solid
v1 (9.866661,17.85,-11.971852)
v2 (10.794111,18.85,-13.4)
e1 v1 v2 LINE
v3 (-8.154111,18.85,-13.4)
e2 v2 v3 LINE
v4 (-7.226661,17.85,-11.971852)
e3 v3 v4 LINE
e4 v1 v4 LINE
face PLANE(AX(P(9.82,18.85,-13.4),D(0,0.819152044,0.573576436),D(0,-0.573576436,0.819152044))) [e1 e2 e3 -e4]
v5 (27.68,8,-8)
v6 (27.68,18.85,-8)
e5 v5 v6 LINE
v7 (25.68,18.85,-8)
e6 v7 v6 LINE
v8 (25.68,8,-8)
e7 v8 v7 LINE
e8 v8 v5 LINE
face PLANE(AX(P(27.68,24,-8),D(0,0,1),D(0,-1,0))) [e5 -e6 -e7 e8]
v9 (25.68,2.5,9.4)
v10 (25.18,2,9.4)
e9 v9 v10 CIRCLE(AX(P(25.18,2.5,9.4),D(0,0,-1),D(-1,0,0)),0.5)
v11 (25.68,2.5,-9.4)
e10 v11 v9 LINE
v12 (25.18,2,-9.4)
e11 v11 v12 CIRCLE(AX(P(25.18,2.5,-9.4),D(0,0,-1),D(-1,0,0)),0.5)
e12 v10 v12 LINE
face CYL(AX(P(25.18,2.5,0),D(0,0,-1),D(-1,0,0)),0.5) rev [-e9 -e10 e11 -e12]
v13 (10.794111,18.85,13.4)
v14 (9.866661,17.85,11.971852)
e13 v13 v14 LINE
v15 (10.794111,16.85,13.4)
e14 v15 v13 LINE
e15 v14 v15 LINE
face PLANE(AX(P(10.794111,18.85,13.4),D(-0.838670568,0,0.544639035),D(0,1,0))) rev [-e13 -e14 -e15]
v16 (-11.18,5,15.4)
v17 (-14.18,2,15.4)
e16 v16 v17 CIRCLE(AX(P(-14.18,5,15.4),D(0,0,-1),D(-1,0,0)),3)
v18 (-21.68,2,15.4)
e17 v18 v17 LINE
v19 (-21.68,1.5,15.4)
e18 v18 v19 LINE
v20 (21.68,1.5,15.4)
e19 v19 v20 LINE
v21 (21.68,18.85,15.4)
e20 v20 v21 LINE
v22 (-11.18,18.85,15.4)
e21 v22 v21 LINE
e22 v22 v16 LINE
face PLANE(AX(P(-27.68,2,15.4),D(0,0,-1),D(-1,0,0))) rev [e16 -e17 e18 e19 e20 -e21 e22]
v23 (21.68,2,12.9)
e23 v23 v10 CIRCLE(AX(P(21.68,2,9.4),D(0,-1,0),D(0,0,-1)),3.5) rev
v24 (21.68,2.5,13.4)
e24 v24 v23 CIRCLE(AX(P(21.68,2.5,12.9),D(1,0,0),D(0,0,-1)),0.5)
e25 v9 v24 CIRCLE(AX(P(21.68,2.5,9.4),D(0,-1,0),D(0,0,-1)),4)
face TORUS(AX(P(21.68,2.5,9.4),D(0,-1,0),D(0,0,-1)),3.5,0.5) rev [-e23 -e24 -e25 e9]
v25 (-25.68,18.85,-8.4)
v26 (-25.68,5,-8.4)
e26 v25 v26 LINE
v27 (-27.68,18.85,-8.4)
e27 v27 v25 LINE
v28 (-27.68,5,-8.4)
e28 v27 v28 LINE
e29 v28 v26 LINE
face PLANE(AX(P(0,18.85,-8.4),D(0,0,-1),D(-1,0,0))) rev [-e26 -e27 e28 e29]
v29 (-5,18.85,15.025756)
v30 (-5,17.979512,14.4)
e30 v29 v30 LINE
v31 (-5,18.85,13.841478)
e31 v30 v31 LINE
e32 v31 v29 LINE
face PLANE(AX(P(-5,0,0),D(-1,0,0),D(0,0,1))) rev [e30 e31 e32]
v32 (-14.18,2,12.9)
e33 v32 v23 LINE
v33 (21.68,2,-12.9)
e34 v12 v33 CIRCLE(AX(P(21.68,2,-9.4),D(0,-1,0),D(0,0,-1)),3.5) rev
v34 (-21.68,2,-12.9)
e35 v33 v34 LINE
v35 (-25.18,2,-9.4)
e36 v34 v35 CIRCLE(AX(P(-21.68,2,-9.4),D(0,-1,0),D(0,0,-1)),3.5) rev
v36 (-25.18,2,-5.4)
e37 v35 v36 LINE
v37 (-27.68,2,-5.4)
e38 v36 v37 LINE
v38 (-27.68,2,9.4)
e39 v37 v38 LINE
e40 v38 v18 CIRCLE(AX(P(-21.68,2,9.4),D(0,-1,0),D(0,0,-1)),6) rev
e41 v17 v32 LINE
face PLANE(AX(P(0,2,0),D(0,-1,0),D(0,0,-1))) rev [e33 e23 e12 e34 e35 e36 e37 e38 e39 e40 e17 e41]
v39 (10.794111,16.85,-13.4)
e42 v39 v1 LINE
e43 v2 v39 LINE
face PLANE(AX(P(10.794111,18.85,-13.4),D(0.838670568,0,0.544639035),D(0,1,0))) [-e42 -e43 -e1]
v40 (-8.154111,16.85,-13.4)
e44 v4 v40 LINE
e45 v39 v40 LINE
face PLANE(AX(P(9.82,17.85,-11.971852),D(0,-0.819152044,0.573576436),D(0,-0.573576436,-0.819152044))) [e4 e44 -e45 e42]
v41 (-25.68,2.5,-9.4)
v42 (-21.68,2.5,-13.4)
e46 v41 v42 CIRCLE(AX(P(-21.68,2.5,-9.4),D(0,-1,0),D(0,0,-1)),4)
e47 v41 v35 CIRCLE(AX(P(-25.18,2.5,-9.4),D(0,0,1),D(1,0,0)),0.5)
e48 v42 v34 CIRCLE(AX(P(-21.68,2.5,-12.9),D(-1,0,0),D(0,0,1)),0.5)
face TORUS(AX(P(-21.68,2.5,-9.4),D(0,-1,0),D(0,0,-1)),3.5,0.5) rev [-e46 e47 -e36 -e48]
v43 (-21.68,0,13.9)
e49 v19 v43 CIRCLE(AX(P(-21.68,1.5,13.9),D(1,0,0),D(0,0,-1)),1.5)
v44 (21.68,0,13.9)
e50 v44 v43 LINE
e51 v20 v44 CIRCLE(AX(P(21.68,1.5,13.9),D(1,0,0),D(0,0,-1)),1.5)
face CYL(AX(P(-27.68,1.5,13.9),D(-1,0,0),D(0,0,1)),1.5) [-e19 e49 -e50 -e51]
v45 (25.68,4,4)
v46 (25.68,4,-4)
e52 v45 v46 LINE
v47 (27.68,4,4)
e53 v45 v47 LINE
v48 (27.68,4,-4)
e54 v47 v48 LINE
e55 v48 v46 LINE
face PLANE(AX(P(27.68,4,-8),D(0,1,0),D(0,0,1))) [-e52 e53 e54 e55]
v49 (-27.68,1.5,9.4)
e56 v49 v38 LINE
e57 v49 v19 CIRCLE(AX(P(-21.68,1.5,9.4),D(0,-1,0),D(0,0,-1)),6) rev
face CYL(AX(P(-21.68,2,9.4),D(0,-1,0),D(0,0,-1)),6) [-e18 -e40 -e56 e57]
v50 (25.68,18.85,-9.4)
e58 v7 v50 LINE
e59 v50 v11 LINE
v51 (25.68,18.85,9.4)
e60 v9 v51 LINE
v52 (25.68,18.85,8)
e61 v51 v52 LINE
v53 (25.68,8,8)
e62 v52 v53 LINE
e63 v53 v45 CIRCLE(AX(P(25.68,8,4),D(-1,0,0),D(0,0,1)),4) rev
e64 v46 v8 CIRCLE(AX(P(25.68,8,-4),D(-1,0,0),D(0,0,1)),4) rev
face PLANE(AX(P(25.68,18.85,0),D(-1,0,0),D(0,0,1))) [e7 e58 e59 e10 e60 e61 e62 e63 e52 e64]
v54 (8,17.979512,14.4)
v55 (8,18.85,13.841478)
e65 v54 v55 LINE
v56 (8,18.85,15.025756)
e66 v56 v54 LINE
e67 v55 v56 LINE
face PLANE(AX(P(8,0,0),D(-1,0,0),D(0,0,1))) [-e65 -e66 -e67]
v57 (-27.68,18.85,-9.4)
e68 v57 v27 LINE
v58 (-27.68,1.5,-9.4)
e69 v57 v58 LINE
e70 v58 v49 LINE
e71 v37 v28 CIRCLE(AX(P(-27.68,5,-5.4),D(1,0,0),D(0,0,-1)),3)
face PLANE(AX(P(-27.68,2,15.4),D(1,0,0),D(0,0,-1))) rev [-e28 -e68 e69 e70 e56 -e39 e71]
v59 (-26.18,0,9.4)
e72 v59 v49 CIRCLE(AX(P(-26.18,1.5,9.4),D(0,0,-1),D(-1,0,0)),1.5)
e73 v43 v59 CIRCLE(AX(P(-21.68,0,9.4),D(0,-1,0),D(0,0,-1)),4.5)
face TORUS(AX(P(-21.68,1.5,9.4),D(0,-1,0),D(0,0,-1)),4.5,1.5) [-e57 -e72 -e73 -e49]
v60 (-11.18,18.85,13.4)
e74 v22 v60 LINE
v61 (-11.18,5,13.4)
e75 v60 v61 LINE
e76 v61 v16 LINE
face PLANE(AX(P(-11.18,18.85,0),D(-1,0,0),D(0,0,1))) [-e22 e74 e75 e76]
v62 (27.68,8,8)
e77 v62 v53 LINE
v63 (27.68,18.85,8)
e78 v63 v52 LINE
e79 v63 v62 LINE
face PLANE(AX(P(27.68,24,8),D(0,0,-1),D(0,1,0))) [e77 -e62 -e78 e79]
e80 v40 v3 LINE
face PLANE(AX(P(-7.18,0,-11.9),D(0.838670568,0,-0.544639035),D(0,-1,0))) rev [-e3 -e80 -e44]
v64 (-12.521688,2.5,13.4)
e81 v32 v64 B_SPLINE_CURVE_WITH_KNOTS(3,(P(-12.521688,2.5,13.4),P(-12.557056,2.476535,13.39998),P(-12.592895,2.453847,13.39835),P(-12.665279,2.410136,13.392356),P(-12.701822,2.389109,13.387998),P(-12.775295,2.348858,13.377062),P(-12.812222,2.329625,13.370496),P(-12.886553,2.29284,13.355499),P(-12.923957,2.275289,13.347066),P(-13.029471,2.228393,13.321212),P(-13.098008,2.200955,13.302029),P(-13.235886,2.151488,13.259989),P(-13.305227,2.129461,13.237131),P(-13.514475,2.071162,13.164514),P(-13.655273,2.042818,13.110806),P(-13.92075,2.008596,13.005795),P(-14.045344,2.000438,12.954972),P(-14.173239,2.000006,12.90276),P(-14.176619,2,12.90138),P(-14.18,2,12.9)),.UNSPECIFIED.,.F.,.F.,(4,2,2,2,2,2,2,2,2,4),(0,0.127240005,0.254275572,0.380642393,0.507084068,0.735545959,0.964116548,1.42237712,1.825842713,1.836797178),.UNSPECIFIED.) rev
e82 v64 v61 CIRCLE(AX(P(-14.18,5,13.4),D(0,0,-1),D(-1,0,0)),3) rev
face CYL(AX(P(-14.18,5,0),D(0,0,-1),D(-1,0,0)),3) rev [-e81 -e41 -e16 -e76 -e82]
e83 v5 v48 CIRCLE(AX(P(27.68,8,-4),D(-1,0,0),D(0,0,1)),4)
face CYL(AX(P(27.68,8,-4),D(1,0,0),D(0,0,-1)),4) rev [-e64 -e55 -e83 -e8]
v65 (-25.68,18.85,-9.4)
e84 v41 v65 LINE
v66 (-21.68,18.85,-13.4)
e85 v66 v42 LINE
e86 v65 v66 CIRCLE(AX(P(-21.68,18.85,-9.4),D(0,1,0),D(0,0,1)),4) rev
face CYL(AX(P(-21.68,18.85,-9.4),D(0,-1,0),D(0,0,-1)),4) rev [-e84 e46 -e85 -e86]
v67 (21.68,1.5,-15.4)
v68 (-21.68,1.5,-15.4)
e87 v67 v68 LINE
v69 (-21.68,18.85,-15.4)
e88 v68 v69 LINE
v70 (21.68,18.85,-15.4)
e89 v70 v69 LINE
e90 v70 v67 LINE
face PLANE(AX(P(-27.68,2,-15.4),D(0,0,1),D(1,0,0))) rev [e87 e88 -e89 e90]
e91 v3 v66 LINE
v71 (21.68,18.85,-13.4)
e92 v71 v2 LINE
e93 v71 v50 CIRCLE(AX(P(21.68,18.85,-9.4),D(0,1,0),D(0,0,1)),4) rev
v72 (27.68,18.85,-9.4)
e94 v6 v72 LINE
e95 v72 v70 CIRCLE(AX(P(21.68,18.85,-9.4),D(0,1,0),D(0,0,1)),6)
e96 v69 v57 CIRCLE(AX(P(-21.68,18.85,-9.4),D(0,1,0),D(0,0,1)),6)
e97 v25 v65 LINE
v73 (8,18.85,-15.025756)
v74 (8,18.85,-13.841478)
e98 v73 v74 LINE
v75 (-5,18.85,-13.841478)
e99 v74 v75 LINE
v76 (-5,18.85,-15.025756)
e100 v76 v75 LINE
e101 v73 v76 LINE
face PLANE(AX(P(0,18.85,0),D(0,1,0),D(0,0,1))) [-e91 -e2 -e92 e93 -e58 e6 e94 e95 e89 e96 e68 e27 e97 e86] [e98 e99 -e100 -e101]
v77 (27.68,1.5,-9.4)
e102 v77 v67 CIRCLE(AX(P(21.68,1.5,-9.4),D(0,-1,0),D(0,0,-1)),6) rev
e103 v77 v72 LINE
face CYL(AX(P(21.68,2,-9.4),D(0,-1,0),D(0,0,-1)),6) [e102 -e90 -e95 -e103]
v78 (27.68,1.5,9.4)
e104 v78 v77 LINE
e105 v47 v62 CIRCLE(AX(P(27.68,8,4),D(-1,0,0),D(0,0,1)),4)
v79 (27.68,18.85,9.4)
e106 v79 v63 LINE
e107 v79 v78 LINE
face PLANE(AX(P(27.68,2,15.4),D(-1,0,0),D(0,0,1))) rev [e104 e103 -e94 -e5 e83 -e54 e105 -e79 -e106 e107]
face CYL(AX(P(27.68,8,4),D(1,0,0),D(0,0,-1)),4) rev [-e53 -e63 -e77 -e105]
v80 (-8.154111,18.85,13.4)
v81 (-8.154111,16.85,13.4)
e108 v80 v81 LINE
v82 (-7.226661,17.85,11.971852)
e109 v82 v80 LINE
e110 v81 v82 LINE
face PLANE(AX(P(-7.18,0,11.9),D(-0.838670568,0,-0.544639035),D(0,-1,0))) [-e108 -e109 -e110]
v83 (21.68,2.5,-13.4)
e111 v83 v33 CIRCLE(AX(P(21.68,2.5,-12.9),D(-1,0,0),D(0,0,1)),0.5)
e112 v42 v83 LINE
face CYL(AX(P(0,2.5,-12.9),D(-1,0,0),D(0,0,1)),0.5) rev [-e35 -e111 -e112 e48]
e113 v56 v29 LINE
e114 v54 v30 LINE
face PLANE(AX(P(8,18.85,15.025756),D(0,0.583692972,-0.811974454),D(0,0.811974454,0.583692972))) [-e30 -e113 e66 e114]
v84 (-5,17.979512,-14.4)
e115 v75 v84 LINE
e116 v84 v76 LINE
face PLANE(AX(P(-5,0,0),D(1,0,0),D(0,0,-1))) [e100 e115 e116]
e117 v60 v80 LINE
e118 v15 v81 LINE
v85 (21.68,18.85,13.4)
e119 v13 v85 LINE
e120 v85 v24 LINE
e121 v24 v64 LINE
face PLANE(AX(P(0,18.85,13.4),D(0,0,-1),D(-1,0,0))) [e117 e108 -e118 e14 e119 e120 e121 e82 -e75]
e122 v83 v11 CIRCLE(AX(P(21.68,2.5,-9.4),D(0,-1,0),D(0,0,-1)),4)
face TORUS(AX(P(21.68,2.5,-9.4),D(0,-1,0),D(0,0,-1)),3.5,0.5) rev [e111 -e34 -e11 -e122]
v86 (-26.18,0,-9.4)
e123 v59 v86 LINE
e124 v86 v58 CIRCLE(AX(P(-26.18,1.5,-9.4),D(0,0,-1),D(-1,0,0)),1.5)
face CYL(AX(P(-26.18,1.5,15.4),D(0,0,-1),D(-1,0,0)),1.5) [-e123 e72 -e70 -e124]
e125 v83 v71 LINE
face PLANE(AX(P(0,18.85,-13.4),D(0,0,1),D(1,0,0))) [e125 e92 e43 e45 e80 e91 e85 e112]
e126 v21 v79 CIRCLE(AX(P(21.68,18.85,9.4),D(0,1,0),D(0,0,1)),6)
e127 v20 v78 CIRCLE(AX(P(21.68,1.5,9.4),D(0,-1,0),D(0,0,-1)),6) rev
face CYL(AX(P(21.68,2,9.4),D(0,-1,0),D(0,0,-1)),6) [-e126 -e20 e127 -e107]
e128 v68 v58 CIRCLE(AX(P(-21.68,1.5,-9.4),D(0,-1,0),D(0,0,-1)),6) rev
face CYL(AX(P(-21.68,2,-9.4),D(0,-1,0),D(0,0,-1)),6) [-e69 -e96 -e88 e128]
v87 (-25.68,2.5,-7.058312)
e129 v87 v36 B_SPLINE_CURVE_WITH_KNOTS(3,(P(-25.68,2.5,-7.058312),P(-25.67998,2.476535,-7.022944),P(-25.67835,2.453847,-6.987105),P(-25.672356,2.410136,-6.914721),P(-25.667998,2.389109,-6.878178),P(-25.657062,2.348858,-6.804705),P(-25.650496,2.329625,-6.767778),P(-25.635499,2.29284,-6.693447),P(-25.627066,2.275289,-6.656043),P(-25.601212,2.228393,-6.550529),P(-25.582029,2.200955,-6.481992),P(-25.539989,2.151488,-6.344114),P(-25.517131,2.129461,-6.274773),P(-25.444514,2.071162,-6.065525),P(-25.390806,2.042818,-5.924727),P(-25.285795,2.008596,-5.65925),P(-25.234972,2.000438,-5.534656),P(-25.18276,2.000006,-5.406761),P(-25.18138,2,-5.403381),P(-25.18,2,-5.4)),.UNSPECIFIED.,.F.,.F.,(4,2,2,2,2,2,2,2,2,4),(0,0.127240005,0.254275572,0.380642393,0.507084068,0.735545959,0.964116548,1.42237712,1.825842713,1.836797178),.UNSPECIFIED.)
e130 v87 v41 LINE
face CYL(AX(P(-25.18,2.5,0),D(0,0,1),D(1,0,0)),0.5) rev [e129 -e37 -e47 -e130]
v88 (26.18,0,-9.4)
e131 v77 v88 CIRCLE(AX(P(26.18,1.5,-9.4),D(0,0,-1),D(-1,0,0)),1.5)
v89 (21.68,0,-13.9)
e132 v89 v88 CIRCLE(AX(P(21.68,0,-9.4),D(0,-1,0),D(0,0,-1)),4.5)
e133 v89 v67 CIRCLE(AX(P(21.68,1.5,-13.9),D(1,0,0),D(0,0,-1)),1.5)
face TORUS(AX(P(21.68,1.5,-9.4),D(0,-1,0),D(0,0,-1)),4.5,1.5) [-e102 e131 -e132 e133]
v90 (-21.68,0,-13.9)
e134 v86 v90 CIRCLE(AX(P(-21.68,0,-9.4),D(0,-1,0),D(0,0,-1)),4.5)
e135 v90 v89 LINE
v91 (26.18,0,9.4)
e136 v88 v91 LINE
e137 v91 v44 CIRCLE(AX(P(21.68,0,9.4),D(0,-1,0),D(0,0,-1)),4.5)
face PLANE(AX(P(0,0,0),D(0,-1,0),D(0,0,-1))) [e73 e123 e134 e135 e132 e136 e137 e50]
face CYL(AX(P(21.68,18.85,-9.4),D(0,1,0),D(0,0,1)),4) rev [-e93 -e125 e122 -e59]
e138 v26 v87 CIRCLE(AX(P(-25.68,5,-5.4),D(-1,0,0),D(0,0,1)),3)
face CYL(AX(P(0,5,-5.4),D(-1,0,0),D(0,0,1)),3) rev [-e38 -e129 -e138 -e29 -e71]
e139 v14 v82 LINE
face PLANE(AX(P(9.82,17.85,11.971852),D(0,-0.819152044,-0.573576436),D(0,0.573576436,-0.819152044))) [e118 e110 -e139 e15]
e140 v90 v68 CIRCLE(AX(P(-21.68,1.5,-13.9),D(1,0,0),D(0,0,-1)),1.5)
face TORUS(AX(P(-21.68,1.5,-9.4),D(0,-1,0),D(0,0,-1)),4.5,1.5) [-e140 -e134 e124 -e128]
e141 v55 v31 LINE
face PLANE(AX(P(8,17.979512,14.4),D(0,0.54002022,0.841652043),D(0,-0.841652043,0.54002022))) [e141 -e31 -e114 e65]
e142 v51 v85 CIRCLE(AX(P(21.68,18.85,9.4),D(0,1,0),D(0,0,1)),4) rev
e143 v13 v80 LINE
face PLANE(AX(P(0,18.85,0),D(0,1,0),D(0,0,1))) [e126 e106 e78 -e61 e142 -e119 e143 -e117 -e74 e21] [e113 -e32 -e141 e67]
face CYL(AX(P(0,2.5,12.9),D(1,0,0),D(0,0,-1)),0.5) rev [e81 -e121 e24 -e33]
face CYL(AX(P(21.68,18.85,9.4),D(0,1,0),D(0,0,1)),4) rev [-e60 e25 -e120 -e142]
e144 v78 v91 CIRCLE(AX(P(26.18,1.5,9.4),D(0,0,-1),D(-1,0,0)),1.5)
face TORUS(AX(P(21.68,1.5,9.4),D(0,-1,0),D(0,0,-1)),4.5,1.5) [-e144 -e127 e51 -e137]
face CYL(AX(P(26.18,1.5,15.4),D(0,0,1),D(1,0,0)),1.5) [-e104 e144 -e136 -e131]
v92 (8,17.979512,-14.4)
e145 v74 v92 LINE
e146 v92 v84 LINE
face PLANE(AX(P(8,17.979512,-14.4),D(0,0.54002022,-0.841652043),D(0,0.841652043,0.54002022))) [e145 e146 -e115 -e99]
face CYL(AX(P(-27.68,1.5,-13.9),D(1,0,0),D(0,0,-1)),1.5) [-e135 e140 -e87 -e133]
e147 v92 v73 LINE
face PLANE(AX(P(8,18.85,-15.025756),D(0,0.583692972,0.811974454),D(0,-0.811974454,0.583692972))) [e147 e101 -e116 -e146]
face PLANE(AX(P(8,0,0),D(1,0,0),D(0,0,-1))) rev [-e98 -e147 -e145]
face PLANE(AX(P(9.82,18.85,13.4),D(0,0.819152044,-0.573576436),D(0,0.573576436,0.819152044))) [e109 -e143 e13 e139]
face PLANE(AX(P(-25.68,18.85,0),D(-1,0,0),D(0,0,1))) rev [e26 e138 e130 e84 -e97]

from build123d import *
from OCP.BRepFilletAPI import BRepFilletAPI_MakeFillet

# Parameters (mm, degrees)
SKETCH1_W               = 55.36
SKETCH1_H               = 30.8
BOSS_EXTRUDE1_DEPTH     = 2
SKETCH3_W               = 2
SKETCH3_H               = 5
BOSS_EXTRUDE3_DEPTH     = 16.85
SKETCH5_W               = 16
SKETCH5_H               = 20
CUT_EXTRUDE1_DEPTH      = 37.860071894
FILLET1_R1              = 6
FILLET1_R2              = 4
FILLET2_R               = 1.5
BOSS_EXTRUDE4_START     = -3
BOSS_EXTRUDE4_DEPTH     = 17
CHAMFER1_SIZE           = 0.97411139
CHAMFER1_SIZE_2         = 1.5
FILLET6_R               = 0.5
FILLET7_R               = 4
CUT_EXTRUDE2_DEPTH      = 8
CUT_EXTRUDE2_DEPTH_BACK = 5
FILLET8_START           = -27.68
FILLET8_DEPTH           = 2
FILLET8_START_2         = 12.8999999
FILLET8_2_DEPTH         = 2.5000001
FILLET8_START_3         = -8.4
FILLET8_3_DEPTH         = 3.0000001
FILLET8_START_4         = -25.68
FILLET8_4_DEPTH         = 14.5


with BuildPart() as part:
    # Sketch1 → Boss-Extrude1 (new body)
    with BuildSketch(Plane(origin=(0, 0, 0), x_dir=(1, 0, 0), z_dir=(0, 1, 0))):
        Rectangle(SKETCH1_W, SKETCH1_H)
    extrude(amount=BOSS_EXTRUDE1_DEPTH)

    # Sketch3 → Boss-Extrude3 (add)
    with BuildSketch(Plane(origin=(0, 2, 0), x_dir=(1, 0, 0), z_dir=(0, 1, 0))):
        with Locations((-26.68, 10.9)):
            Rectangle(SKETCH3_W, SKETCH3_H)
        Polygon((-27.68, 15.4), (-27.68, 13.4), (-25.68, 13.4), (25.68, 13.4), (25.68, -13.4), (-11.18, -13.4), (-11.18, -15.4), (27.68, -15.4), (27.68, 15.4), align=None)
    extrude(amount=BOSS_EXTRUDE3_DEPTH)

    # Sketch5 → Cut-Extrude1 (cut, through all)
    with BuildSketch(Plane(origin=(0, 0, 0), x_dir=(0, 0, -1), z_dir=(1, 0, 0))):
        with Locations((0, 14)):
            Rectangle(SKETCH5_W, SKETCH5_H)
    extrude(amount=CUT_EXTRUDE1_DEPTH, mode=Mode.SUBTRACT)

    # Fillet1: one fillet with a radius per group of edges: ONE call of the kernel's fillet builder (fillet() takes one radius for all edges)
    fillet1_edges_1 = [part.edges().sort_by_distance(p)[0] for p in [
        (27.68, 9.425, -15.4),
        (27.68, 9.425, 15.4),
        (-27.68, 9.425, -15.4),
        (-27.68, 1, 15.4),
    ]]
    fillet1_edges_2 = [part.edges().sort_by_distance(p)[0] for p in [
        (25.68, 10.425, -13.4),
        (25.68, 10.425, 13.4),
        (-25.68, 10.425, -13.4),
    ]]
    fillet1 = BRepFilletAPI_MakeFillet(part.part.solid().wrapped)
    for e in fillet1_edges_1:
        fillet1.Add(FILLET1_R1, e.wrapped)
    for e in fillet1_edges_2:
        fillet1.Add(FILLET1_R2, e.wrapped)
    add(Compound.cast(fillet1.Shape()), mode=Mode.REPLACE)

    # Fillet2
    fillet2_edges = [part.edges().sort_by_distance(p)[0] for p in [
        (0, 0, 15.4),
        (27.68, 0, 0),
        (-27.68, 0, 0),
        (0, 0, -15.4),
        (25.922640687, 0, -13.642640687),
        (25.922640687, 0, 13.642640687),
        (-25.922640687, 0, -13.642640687),
        (-25.922640687, 0, 13.642640687),
    ]]
    fillet(fillet2_edges, radius=FILLET2_R)

    # Sketch4 → Boss-Extrude4 (add)
    with BuildSketch(Plane.ZY.offset(10.18).offset(BOSS_EXTRUDE4_START)):
        Polygon((-13.4, 18.85), (-11.971851993, 17.85), (-13.4, 16.85), align=None)
        Polygon((13.4, 18.85), (11.971851993, 17.85), (13.4, 16.85), align=None)
    extrude(amount=-BOSS_EXTRUDE4_DEPTH)

    # Chamfer1
    # the kernel refuses this chamfer: 1.5, 0.97411139 mm, written as the material it adds along each edge
    with BuildSketch(Plane(origin=(9.82, 12.9733385, 13.4), x_dir=(1, 0, 0), z_dir=(0, 1, 0))) as chamfer1_piece_1_section:
        Polygon((CHAMFER1_SIZE, 0), (0, CHAMFER1_SIZE_2), (0, 0), align=None)
    chamfer1_piece_1 = extrude(amount=5.8766615, mode=Mode.PRIVATE)
    chamfer1_piece_1 = split(chamfer1_piece_1, bisect_by=Plane(origin=(9.82, 15.574617411, 15.221435103), z_dir=(0, 0.8191520442889897, 0.5735764363510492)), keep=Keep.TOP, mode=Mode.PRIVATE)
    chamfer1_piece_1 = split(chamfer1_piece_1, bisect_by=Plane(origin=(9.82, 16.916637554, 10.638872277), z_dir=(0, -0.8191520442889973, 0.5735764363510382)), keep=Keep.TOP, mode=Mode.PRIVATE)
    add(chamfer1_piece_1)
    with BuildSketch(Plane(origin=(-7.18, 12.9733385, 13.4), x_dir=(-1, 0, 0), z_dir=(0, 1, 0))) as chamfer1_piece_2_section:
        Polygon((CHAMFER1_SIZE, 0), (0, -CHAMFER1_SIZE_2), (0, 0), align=None)
    chamfer1_piece_2 = extrude(amount=5.8766615, mode=Mode.PRIVATE)
    chamfer1_piece_2 = split(chamfer1_piece_2, bisect_by=Plane(origin=(-7.18, 15.574617411, 15.221435103), z_dir=(0, 0.8191520442889897, 0.5735764363510492)), keep=Keep.TOP, mode=Mode.PRIVATE)
    chamfer1_piece_2 = split(chamfer1_piece_2, bisect_by=Plane(origin=(-7.18, 16.916637554, 10.638872277), z_dir=(0, -0.8191520442889973, 0.5735764363510382)), keep=Keep.TOP, mode=Mode.PRIVATE)
    add(chamfer1_piece_2)
    with BuildSketch(Plane(origin=(9.82, 12.9733385, -13.4), x_dir=(1, 0, 0), z_dir=(0, 1, 0))) as chamfer1_piece_3_section:
        Polygon((CHAMFER1_SIZE, 0), (0, -CHAMFER1_SIZE_2), (0, 0), align=None)
    chamfer1_piece_3 = extrude(amount=5.8766615, mode=Mode.PRIVATE)
    chamfer1_piece_3 = split(chamfer1_piece_3, bisect_by=Plane(origin=(9.82, 15.574617411, -15.221435103), z_dir=(0, 0.8191520442889897, -0.5735764363510492)), keep=Keep.TOP, mode=Mode.PRIVATE)
    chamfer1_piece_3 = split(chamfer1_piece_3, bisect_by=Plane(origin=(9.82, 16.916637554, -10.638872277), z_dir=(0, -0.8191520442889973, -0.5735764363510382)), keep=Keep.TOP, mode=Mode.PRIVATE)
    add(chamfer1_piece_3)
    with BuildSketch(Plane(origin=(-7.18, 12.9733385, -13.4), x_dir=(-1, 0, 0), z_dir=(0, 1, 0))) as chamfer1_piece_4_section:
        Polygon((CHAMFER1_SIZE, 0), (0, CHAMFER1_SIZE_2), (0, 0), align=None)
    chamfer1_piece_4 = extrude(amount=5.8766615, mode=Mode.PRIVATE)
    chamfer1_piece_4 = split(chamfer1_piece_4, bisect_by=Plane(origin=(-7.18, 15.574617411, -15.221435103), z_dir=(0, 0.8191520442889897, -0.5735764363510492)), keep=Keep.TOP, mode=Mode.PRIVATE)
    chamfer1_piece_4 = split(chamfer1_piece_4, bisect_by=Plane(origin=(-7.18, 16.916637554, -10.638872277), z_dir=(0, -0.8191520442889973, -0.5735764363510382)), keep=Keep.TOP, mode=Mode.PRIVATE)
    add(chamfer1_piece_4)

    # Fillet6
    fillet6_edges = [part.edges().sort_by_distance(p)[0] for p in [
        (-25.68, 2, -8.9),
        (5.25, 2, 13.4),
        (0, 2, -13.4),
        (25.68, 2, 0),
        (24.508427125, 2, -12.228427125),
        (24.508427125, 2, 12.228427125),
        (-24.508427125, 2, -12.228427125),
    ]]
    fillet(fillet6_edges, radius=FILLET6_R)

    # Fillet7
    fillet7_edges = [part.edges().sort_by_distance(p)[0] for p in [
        (26.68, 4, -8),
        (26.68, 4, 8),
    ]]
    fillet(fillet7_edges, radius=FILLET7_R)

    # Sketch6 → Cut-Extrude2 (cut, two sides: drawn at the far end of the back side and taken through both)
    with BuildSketch(Plane(origin=(0, 0, 0), x_dir=(0, 0, -1), z_dir=(1, 0, 0)).offset(-CUT_EXTRUDE2_DEPTH_BACK)):
        Polygon((-15.025755833, 18.85), (-14.4, 17.97951196), (-13.841478047, 18.85), align=None)
        Polygon((13.841478047, 18.85), (15.025755833, 18.85), (14.4, 17.97951196), align=None)
    extrude(amount=CUT_EXTRUDE2_DEPTH + CUT_EXTRUDE2_DEPTH_BACK, mode=Mode.SUBTRACT)

    # Fillet8: read off the stored shape, not the designer's step
    # Fillet8 outline → Fillet8 (add)
    with BuildSketch(Plane.YZ.offset(FILLET8_START)):
        with BuildLine():
            Line((2, -8.4), (5, -8.4))
            ThreePointArc((5, -8.4), (2.878679656, -7.521320344), (2, -5.4))
            Line((2, -5.4), (2, -8.4))
        make_face()
    extrude(amount=FILLET8_DEPTH)

    # Fillet8 2 outline → Fillet8 2 (add)
    with BuildSketch(Plane.XY.offset(FILLET8_START_2)):
        with BuildLine():
            ThreePointArc((-11.18, 5), (-12.058679656, 2.878679656), (-14.18, 2))
            Line((-14.18, 2), (-11.18, 2))
            Line((-11.18, 2), (-11.18, 5))
        make_face()
    extrude(amount=FILLET8_2_DEPTH)

    # Fillet8 3 outline → Fillet8 3 (add)
    with BuildSketch(Plane.XY.offset(FILLET8_START_3)):
        with BuildLine():
            ThreePointArc((-25.18, 2), (-25.533553391, 2.146446609), (-25.68, 2.5))
            Line((-25.68, 2.5), (-25.68, 2))
            Line((-25.68, 2), (-25.18, 2))
        make_face()
    extrude(amount=FILLET8_3_DEPTH)

    # Fillet8 4 outline → Fillet8 4 (cut)
    with BuildSketch(Plane.YZ.offset(FILLET8_START_4)):
        with BuildLine():
            ThreePointArc((2.5, 13.4), (2.146446609, 13.253553391), (2, 12.9))
            Line((2, 12.9), (5, 12.8999999))
            Line((5, 12.8999999), (5, 13.4))
            Line((5, 13.4), (2.5, 13.4))
        make_face()
        with BuildLine():
            ThreePointArc((2, -5.4), (2.127718677, -6.266025404), (2.5, -7.058312396))
            Line((2.5, -7.058312396), (2.5, -5.3999999))
            Line((2.5, -5.3999999), (2, -5.4))
        make_face()
    extrude(amount=FILLET8_4_DEPTH, mode=Mode.SUBTRACT)


solid = part.part
